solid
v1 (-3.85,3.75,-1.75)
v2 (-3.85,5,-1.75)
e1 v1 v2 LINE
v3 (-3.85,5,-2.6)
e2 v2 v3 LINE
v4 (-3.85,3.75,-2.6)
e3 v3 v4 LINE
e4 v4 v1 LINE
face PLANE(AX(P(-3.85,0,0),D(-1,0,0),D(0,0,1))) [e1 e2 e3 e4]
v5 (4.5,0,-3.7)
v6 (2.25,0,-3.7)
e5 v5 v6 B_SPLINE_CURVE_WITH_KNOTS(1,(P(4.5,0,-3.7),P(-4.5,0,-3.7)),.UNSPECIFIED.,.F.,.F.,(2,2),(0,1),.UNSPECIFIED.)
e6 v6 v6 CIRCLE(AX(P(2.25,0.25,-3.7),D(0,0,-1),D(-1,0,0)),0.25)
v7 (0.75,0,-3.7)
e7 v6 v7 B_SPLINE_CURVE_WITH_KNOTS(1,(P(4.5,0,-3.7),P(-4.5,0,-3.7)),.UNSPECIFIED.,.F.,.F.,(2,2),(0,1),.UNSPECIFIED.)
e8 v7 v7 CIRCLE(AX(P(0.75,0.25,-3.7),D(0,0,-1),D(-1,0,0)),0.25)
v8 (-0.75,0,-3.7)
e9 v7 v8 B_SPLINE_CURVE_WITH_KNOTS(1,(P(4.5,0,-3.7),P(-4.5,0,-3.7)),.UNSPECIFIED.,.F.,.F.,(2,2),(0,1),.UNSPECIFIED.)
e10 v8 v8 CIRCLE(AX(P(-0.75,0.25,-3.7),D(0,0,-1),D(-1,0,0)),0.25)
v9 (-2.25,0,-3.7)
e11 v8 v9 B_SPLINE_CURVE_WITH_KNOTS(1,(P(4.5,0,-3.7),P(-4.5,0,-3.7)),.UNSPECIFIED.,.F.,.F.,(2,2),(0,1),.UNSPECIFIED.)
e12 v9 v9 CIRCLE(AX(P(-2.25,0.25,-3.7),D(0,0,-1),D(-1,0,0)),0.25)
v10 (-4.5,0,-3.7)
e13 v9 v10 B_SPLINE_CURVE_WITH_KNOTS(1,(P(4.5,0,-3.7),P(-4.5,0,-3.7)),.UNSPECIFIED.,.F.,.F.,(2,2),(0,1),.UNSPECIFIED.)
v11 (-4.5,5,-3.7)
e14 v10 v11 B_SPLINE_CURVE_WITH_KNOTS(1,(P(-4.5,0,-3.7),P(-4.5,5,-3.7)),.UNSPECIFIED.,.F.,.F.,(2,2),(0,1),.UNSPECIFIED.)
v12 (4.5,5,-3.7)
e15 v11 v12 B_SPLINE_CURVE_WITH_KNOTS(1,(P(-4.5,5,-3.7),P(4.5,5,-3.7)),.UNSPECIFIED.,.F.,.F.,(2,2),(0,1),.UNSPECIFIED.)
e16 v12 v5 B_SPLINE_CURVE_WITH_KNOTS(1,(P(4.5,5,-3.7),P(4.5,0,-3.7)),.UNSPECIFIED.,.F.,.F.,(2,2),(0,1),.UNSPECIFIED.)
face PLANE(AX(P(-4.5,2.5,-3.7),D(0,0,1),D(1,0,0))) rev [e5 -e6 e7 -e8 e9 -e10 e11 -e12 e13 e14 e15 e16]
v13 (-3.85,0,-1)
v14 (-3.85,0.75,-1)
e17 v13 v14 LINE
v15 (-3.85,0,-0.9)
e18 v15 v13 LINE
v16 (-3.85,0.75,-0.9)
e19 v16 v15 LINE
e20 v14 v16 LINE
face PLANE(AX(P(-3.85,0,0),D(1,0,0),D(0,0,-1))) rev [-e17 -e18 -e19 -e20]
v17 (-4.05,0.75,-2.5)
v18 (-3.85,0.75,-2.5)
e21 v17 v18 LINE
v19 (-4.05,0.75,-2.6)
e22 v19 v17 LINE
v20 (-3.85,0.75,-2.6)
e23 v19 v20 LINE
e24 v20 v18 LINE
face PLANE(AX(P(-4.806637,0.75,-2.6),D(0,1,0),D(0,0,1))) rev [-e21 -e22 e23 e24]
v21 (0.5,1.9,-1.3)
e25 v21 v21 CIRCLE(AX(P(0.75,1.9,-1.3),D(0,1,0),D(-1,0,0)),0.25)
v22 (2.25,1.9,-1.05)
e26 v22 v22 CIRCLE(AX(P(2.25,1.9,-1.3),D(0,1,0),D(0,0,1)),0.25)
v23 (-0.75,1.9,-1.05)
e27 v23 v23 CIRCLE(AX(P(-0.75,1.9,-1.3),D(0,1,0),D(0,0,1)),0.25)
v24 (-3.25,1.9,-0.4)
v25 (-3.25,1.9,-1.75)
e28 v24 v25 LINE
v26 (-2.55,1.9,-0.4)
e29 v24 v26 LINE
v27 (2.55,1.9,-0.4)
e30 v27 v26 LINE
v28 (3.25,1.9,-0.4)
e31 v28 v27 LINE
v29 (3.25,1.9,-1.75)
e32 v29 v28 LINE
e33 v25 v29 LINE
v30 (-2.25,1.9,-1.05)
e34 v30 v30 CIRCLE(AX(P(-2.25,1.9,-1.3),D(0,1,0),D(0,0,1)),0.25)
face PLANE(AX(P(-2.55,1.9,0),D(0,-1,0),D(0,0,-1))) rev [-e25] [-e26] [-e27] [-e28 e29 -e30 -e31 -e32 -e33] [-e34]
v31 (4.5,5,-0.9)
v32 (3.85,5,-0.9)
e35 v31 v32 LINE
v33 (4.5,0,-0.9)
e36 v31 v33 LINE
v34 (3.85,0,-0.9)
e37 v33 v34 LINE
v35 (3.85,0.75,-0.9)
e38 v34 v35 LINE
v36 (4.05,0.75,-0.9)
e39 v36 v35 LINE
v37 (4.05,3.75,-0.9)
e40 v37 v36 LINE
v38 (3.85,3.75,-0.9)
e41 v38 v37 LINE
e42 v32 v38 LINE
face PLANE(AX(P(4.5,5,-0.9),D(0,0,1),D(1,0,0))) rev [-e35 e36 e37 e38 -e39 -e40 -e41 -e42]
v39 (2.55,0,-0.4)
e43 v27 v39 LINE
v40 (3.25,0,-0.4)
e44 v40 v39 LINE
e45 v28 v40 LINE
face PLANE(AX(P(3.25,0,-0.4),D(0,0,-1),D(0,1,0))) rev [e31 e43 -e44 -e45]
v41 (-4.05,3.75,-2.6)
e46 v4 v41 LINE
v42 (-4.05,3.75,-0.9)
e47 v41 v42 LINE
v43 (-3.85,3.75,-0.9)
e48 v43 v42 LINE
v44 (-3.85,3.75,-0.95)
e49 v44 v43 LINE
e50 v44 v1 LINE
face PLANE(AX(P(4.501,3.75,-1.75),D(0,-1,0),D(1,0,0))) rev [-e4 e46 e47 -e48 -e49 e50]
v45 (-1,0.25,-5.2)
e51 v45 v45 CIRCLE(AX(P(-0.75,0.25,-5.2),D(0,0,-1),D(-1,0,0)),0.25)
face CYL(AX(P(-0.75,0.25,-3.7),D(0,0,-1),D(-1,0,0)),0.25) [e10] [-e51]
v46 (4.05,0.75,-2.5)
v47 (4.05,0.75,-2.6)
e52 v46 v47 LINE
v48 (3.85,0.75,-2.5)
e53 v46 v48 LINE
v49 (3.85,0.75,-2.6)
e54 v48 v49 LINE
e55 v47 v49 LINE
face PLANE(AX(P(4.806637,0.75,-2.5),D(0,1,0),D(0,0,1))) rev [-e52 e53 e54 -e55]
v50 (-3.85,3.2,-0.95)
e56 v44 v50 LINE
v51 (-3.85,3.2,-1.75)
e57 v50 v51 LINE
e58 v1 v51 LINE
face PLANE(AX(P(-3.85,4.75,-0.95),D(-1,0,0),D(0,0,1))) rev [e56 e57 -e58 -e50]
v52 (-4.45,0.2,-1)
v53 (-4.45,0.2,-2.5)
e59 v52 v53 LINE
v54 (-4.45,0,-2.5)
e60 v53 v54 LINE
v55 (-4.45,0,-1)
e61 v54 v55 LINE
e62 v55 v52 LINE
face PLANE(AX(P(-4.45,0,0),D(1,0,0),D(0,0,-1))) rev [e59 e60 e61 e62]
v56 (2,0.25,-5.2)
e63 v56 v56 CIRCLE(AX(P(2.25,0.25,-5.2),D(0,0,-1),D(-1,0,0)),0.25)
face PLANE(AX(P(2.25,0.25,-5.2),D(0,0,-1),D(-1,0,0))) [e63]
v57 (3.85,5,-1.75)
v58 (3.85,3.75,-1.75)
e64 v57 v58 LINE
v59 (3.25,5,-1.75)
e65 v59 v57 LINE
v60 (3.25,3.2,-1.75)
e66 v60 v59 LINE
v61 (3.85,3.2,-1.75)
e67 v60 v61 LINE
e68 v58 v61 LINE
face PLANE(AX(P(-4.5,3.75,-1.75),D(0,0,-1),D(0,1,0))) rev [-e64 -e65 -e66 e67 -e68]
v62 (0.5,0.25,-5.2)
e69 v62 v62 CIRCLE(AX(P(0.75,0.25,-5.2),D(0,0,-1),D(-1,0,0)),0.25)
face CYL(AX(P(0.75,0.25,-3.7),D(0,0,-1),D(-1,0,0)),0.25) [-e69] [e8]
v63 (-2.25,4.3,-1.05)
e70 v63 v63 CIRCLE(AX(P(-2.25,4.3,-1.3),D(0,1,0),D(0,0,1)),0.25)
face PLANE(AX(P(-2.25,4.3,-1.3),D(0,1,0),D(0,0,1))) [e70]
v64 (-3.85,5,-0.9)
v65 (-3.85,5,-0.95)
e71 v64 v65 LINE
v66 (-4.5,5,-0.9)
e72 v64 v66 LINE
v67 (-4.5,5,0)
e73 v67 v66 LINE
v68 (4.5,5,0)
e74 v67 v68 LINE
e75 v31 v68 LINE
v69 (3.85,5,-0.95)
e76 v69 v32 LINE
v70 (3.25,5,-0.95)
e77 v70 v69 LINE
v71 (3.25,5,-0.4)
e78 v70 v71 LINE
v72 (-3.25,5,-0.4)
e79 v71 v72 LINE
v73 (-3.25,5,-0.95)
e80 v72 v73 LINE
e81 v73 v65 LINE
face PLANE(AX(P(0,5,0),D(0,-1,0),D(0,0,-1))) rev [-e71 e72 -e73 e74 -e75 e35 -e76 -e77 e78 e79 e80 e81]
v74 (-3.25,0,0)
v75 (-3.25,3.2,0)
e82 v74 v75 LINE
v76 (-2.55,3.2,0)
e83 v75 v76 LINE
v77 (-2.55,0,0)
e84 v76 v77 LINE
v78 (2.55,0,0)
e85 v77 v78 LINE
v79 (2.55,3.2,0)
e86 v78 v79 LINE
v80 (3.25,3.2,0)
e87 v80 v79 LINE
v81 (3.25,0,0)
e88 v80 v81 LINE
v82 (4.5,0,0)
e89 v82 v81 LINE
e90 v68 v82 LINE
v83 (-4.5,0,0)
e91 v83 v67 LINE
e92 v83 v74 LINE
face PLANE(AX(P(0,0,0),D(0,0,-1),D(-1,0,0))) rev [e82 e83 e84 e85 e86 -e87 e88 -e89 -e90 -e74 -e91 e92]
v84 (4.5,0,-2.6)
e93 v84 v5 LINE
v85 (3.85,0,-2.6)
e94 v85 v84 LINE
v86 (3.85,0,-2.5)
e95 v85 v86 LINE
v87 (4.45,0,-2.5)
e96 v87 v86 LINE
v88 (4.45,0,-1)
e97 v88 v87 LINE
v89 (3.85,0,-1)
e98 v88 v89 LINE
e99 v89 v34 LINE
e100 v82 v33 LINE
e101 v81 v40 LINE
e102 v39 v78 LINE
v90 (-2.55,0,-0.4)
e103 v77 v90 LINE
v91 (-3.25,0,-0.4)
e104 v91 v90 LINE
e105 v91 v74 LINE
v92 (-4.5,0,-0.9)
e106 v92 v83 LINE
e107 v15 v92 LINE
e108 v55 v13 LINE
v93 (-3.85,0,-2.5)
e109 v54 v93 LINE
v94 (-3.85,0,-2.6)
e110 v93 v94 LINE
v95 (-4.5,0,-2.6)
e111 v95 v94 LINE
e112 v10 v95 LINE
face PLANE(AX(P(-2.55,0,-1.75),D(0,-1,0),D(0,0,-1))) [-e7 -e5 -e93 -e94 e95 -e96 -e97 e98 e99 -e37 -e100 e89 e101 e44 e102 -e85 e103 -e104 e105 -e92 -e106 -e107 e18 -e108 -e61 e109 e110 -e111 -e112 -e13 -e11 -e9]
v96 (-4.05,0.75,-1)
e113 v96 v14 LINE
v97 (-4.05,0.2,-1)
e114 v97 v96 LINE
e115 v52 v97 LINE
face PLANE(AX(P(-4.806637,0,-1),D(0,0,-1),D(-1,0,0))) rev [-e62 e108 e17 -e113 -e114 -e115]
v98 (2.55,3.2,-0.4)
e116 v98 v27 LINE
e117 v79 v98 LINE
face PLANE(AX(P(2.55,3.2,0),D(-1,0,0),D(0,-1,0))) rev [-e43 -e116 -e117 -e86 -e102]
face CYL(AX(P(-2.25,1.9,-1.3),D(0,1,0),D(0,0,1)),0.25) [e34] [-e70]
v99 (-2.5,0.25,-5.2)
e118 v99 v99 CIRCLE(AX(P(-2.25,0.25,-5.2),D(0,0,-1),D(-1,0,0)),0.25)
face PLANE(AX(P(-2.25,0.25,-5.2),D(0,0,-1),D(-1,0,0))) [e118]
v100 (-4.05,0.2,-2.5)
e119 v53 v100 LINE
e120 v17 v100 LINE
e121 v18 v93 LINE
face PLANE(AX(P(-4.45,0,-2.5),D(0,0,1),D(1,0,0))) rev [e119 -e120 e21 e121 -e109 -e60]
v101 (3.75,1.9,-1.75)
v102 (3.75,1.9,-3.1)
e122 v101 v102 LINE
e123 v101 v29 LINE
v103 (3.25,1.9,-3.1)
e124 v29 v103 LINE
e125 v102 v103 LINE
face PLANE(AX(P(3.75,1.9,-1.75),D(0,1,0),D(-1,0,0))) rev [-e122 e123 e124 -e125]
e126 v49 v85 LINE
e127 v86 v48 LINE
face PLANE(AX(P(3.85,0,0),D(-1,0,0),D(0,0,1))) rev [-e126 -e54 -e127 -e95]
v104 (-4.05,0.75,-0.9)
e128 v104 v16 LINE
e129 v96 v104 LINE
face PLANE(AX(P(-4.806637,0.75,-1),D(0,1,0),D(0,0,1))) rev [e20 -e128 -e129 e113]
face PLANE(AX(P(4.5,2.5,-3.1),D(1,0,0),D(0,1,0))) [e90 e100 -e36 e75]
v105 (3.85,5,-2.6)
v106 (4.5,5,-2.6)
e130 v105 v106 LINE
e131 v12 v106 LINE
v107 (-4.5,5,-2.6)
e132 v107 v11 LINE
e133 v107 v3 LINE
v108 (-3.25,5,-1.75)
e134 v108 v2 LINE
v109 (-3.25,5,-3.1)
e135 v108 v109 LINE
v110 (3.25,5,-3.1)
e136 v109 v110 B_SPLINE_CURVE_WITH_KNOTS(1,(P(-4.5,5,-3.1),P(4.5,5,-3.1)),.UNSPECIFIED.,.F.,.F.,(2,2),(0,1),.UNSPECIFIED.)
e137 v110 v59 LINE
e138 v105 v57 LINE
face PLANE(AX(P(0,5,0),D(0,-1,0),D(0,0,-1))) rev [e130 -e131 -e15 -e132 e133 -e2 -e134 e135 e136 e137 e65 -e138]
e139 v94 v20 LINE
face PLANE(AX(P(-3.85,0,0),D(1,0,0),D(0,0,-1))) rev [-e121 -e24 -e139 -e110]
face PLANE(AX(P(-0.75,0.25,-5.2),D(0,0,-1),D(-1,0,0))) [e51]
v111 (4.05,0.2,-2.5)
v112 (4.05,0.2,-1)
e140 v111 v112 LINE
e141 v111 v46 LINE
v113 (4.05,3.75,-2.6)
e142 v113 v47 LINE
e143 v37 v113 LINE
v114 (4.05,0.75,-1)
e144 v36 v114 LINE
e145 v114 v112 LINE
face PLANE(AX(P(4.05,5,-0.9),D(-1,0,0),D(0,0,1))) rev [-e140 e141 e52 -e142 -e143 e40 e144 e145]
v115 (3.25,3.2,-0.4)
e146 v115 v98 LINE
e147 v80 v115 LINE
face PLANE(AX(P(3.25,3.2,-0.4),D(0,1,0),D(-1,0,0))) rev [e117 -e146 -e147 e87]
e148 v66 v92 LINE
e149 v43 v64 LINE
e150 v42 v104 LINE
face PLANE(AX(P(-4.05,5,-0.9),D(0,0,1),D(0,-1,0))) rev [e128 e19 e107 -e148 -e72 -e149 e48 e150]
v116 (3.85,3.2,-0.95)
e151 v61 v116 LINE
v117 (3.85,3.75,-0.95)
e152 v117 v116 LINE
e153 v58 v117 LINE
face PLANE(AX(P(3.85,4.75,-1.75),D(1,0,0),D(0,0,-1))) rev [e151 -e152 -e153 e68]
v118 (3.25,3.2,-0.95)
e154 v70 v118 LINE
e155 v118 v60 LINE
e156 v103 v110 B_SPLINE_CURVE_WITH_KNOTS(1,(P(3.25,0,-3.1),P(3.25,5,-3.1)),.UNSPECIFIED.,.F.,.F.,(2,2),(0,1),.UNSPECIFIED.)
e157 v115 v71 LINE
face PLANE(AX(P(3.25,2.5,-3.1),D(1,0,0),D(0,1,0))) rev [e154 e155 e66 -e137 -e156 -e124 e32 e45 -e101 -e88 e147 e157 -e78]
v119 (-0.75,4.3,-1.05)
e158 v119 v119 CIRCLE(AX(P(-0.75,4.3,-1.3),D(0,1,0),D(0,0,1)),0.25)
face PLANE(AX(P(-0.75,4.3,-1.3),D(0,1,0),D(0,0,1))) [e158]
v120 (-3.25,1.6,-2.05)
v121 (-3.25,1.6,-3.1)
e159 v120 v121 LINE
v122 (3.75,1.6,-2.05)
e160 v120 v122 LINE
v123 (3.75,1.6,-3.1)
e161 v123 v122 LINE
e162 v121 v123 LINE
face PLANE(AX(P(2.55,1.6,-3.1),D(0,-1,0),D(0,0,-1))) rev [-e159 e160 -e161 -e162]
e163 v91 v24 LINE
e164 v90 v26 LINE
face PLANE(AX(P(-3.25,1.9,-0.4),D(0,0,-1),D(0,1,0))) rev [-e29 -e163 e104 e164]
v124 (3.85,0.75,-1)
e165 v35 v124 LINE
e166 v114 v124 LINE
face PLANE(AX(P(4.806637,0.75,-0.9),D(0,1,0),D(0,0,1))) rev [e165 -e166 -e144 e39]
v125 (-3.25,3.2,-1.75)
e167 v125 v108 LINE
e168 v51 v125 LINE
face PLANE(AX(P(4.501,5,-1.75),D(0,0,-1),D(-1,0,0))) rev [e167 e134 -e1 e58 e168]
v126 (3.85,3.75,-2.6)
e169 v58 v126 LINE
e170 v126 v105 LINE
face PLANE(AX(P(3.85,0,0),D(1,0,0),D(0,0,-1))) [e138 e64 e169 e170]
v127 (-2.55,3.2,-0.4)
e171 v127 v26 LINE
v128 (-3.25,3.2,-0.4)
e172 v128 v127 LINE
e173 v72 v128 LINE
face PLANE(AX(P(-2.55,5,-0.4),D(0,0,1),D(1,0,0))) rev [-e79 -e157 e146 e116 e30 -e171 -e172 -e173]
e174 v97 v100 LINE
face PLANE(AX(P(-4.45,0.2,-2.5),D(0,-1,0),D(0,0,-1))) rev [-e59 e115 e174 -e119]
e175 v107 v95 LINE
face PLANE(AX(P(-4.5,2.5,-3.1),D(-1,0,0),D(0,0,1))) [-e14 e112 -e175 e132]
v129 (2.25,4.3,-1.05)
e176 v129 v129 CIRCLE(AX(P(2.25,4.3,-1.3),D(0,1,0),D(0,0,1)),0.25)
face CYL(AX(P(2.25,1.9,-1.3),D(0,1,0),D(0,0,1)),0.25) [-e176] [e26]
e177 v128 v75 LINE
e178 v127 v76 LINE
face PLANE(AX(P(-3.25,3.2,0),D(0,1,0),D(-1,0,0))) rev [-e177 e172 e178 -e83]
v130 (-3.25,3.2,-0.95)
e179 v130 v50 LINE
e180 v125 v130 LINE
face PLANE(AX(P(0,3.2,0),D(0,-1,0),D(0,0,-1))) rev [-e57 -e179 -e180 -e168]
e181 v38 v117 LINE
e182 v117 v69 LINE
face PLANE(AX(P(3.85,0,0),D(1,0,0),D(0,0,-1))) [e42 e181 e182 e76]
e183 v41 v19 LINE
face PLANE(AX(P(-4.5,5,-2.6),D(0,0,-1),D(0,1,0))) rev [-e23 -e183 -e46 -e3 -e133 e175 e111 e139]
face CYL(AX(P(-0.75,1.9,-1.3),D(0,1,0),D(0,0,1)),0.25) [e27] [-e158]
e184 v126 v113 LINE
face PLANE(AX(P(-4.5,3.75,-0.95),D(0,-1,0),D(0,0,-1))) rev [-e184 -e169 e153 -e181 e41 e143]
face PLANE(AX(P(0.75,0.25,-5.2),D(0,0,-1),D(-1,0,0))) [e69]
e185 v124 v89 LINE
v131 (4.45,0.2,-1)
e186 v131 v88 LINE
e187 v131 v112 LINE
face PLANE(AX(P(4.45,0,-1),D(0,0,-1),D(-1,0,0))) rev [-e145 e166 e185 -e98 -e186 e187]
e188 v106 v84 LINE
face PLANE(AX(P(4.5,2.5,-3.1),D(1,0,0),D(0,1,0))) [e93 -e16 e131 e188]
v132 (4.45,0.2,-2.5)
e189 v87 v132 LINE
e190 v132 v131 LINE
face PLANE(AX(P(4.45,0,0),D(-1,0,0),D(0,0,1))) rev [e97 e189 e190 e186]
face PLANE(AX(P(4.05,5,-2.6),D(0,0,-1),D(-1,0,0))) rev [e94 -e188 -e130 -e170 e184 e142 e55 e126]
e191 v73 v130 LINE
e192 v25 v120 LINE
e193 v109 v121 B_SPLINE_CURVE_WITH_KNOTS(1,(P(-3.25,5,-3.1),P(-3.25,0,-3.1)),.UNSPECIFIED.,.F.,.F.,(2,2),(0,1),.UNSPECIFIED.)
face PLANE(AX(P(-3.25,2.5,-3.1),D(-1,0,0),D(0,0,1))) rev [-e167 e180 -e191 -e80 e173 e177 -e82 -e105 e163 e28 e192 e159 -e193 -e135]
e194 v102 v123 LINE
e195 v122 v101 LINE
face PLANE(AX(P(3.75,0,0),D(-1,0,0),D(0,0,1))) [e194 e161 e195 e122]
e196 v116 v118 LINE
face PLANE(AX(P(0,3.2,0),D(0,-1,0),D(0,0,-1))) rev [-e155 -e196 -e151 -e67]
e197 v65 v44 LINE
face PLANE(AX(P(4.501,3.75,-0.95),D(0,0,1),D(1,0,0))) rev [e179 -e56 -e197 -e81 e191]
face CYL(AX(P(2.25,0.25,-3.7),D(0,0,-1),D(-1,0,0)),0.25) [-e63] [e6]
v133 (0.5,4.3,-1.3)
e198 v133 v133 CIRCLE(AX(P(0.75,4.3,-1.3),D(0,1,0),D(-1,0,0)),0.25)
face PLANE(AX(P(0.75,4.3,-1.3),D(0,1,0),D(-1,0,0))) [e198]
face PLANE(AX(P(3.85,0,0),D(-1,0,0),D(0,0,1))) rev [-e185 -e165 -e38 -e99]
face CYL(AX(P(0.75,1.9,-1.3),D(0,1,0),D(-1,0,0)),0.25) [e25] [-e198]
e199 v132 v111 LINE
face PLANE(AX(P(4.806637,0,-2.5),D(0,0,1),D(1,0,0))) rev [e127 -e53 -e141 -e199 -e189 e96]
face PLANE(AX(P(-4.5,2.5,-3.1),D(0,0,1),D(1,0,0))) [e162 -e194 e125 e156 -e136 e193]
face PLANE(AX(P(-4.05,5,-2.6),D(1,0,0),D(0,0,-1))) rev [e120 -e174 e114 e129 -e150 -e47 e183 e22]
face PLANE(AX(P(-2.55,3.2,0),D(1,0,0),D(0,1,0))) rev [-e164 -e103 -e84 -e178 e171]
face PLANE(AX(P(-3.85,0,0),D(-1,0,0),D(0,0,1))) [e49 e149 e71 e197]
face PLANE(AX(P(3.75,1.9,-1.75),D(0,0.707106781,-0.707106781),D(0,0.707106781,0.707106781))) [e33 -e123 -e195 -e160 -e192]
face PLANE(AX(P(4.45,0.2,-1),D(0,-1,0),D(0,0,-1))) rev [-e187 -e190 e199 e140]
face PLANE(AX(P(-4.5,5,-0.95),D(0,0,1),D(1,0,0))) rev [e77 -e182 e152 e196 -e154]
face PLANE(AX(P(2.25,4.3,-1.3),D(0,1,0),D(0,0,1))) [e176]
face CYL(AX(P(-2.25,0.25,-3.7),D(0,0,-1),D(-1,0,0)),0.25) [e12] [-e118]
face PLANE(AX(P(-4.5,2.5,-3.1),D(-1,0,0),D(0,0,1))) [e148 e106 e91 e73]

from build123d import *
from build123d.topology import SkipClean

# Parameters (mm, degrees)
BOSS_EXTRUDE1_START  = -2.55
BOSS_EXTRUDE1_DEPTH  = 5.1
SKETCH2_W            = 5.1
SKETCH2_H            = 1.9
BOSS_EXTRUDE2_DEPTH  = 1.75
SKETCH3_W            = 5.100000167
SKETCH3_H            = 0.4
BOSS_EXTRUDE3_DEPTH  = 3.1
SKETCH4_W            = 5.1
SKETCH4_H            = 1.6
BOSS_EXTRUDE4_DEPTH  = 1.05
BOSS_EXTRUDE5_DEPTH  = 0.700000167
SKETCH6_W            = 0.4
SKETCH6_H            = 1.8
BOSS_EXTRUDE6_DEPTH  = 0.7
SKETCH7_W            = 0.4
SKETCH7_H            = 1.8
BOSS_EXTRUDE7_DEPTH  = 0.7
BOSS_EXTRUDE8_DEPTH  = 0.7
SKETCH9_W            = 3.1
SKETCH9_H            = 5
BOSS_EXTRUDE9_DEPTH  = 1.25
SKETCH10_W           = 3.1
SKETCH10_H           = 5
BOSS_EXTRUDE10_DEPTH = 1.25
SKETCH11_W           = 9
SKETCH11_H           = 5
BOSS_EXTRUDE11_DEPTH = 0.6
CUT_EXTRUDE1_DEPTH   = 0.5
SKETCH13_W           = 0.45
SKETCH13_H           = 1.7
CUT_EXTRUDE2_DEPTH   = 8.677239185
CUT_EXTRUDE3_REACH   = 12.573
SKETCH14_W           = 0.8
SKETCH14_H           = 1.25
SKETCH15_W           = 0.85
SKETCH15_H           = 1.25
CUT_EXTRUDE4_DEPTH   = 0.2
SKETCH16_W           = 0.05
SKETCH16_H           = 1.25
CUT_EXTRUDE5_DEPTH   = 0.2
CUT_EXTRUDE6_REACH   = 8.647
SKETCH18_W           = 0.6
SKETCH18_H           = 0.8
SKETCH19_W           = 0.45
SKETCH19_H           = 1.7
CUT_EXTRUDE7_DEPTH   = 8.677239185
SKETCH20_W           = 0.8
SKETCH20_H           = 1.25
CUT_EXTRUDE8_DEPTH   = 11.573197246
SKETCH21_W           = 0.85
SKETCH21_H           = 1.25
CUT_EXTRUDE9_DEPTH   = 0.2
CUT_EXTRUDE10_REACH  = 12.412
SKETCH23_W           = 0.1
SKETCH23_H           = 0.75
SKETCH24_W           = 1.5
SKETCH24_H           = 0.2
BOSS_EXTRUDE12_DEPTH = 0.4
CUT_EXTRUDE11_REACH  = 12.412
SKETCH26_W           = 0.1
SKETCH26_H           = 0.75
CUT_EXTRUDE12_REACH  = 12.412
SKETCH28_W           = 0.75
SKETCH28_H           = 0.1
SKETCH29_W           = 1.5
SKETCH29_H           = 0.2
BOSS_EXTRUDE13_DEPTH = 0.4
CUT_EXTRUDE13_REACH  = 12.412
SKETCH31_W           = 0.75
SKETCH31_H           = 0.1
SKETCH32_W           = 0.05
SKETCH32_H           = 1.25
CUT_EXTRUDE14_DEPTH  = 0.2
CUT_EXTRUDE15_REACH  = 8.647
SKETCH34_W           = 0.6
SKETCH34_H           = 0.8
SKETCH35_W           = 0.25
SKETCH35_H           = 2.4
SKETCH36_W           = 0.25
SKETCH36_H           = 2.4
SKETCH37_W           = 0.25
SKETCH37_H           = 2.4
SKETCH38_W           = 0.25
SKETCH38_H           = 2.4
SKETCH39_W           = 0.25
SKETCH39_H           = 1.5
SKETCH40_W           = 0.25
SKETCH40_H           = 1.5
SKETCH41_W           = 0.25
SKETCH41_H           = 1.5
SKETCH42_W           = 0.25
SKETCH42_H           = 1.5


with BuildPart() as part:
    # Boss-Extrude1: read off the stored shape, not the designer's step
    # Boss-Extrude1 outline → Boss-Extrude1 (new body)
    with BuildSketch(Plane.YZ.offset(BOSS_EXTRUDE1_START)):
        Polygon((0, -2.05), (1.6, -2.05), (1.9, -1.75), (0, -1.75), align=None)
    extrude(amount=BOSS_EXTRUDE1_DEPTH)

    # Sketch2 → Boss-Extrude2 (add)
    with BuildSketch(Plane.XY.offset(-1.75)):
        with Locations((0, 0.95)):
            Rectangle(SKETCH2_W, SKETCH2_H)
    extrude(amount=BOSS_EXTRUDE2_DEPTH)

    # Sketch3 → Boss-Extrude3 (add)
    with BuildSketch(Plane(origin=(0, 1.9, 0), x_dir=(-1, 0, 0), z_dir=(0, 1, 0))):
        with Locations((-8.4e-08, -0.2)):
            Rectangle(SKETCH3_W, SKETCH3_H)
    extrude(amount=BOSS_EXTRUDE3_DEPTH)

    # Sketch4 → Boss-Extrude4 (add)
    with BuildSketch(Plane(origin=(0, 0, -2.05), x_dir=(-1, 0, 0), z_dir=(0, 0, -1))):
        with Locations((0, 0.8)):
            Rectangle(SKETCH4_W, SKETCH4_H)
    extrude(amount=BOSS_EXTRUDE4_DEPTH)

    # Sketch5 → Boss-Extrude5 (add)
    with BuildSketch(Plane(origin=(2.55, 0, 0), x_dir=(0, 0, -1), z_dir=(1, 0, 0))):
        Polygon((3.1, 0), (0.4, 0), (0.4, 1.9), (1.75, 1.9), (2.05, 1.6), (3.1, 1.6), align=None)
    extrude(amount=BOSS_EXTRUDE5_DEPTH)

    # Sketch6 → Boss-Extrude6 (add)
    with BuildSketch(Plane(origin=(2.55, 0, 0), x_dir=(0, 0, -1), z_dir=(1, 0, 0))):
        with Locations((0.2, 4.1)):
            Rectangle(SKETCH6_W, SKETCH6_H)
    extrude(amount=BOSS_EXTRUDE6_DEPTH)

    # Sketch7 → Boss-Extrude7 (add)
    with BuildSketch(Plane.ZY.offset(2.55)):
        with Locations((-0.2, 4.1)):
            Rectangle(SKETCH7_W, SKETCH7_H)
    extrude(amount=BOSS_EXTRUDE7_DEPTH)

    # Sketch8 → Boss-Extrude8 (add)
    with BuildSketch(Plane.ZY.offset(2.55)):
        Polygon((-0.4, 1.9), (-0.4, 0), (-3.1, 0), (-3.1, 1.6), (-2.05, 1.6), (-1.75, 1.9), align=None)
    extrude(amount=BOSS_EXTRUDE8_DEPTH)

    # Sketch9 → Boss-Extrude9 (add)
    with BuildSketch(Plane.ZY.offset(3.25)):
        with Locations((-1.55, 2.5)):
            Rectangle(SKETCH9_W, SKETCH9_H)
    extrude(amount=BOSS_EXTRUDE9_DEPTH)

    # Sketch10 → Boss-Extrude10 (add)
    with BuildSketch(Plane(origin=(3.250000167, 0, 0), x_dir=(0, 0, -1), z_dir=(1, 0, 0))):
        with Locations((1.55, 2.5)):
            Rectangle(SKETCH10_W, SKETCH10_H)
    extrude(amount=BOSS_EXTRUDE10_DEPTH)

    # Sketch11 → Boss-Extrude11 (add)
    with SkipClean():  # the faces are left unmerged after this step: merging them gives an invalid solid
        with BuildSketch(Plane(origin=(0, 0, -3.1), x_dir=(-1, 0, 0), z_dir=(0, 0, -1))):
            with Locations((0, 2.5)):
                Rectangle(SKETCH11_W, SKETCH11_H)
        extrude(amount=BOSS_EXTRUDE11_DEPTH)

    # Sketch12 → Cut-Extrude1 (cut)
    with SkipClean():  # the faces are left unmerged after this step: merging them gives an invalid solid
        with BuildSketch(Plane.ZY.offset(-3.250000167)):
            Polygon((-3.1, 1.6), (-2.05, 1.6), (-1.75, 1.9), (-3.1, 1.9), align=None)
        extrude(amount=-CUT_EXTRUDE1_DEPTH, mode=Mode.SUBTRACT)

    # Sketch13 → Cut-Extrude2 (cut, through all)
    with SkipClean():  # the faces are left unmerged after this step: merging them gives an invalid solid
        with BuildSketch(Plane.XZ):
            with Locations((-4.275, -1.75)):
                Rectangle(SKETCH13_W, SKETCH13_H)
        extrude(amount=-CUT_EXTRUDE2_DEPTH, mode=Mode.SUBTRACT)

    # Sketch14 → Cut-Extrude3 (cut, up to next)
    with BuildSketch(Plane.ZY.offset(4.05), mode=Mode.PRIVATE) as cut_extrude3_sk1:
        with Locations((-1.35, 4.375)):
            Rectangle(SKETCH14_W, SKETCH14_H)
    cut_extrude3_tool1 = extrude(cut_extrude3_sk1.sketch, amount=-CUT_EXTRUDE3_REACH, mode=Mode.PRIVATE) & part.part
    add(cut_extrude3_tool1.solids().sort_by_distance((-4.05, 4.375, -1.35))[0], mode=Mode.SUBTRACT)

    # Sketch15 → Cut-Extrude4 (cut)
    with SkipClean():  # the faces are left unmerged after this step: merging them gives an invalid solid
        with BuildSketch(Plane.ZY.offset(4.05)):
            with Locations((-2.175, 4.375)):
                Rectangle(SKETCH15_W, SKETCH15_H)
        extrude(amount=-CUT_EXTRUDE4_DEPTH, mode=Mode.SUBTRACT)

    # Sketch16 → Cut-Extrude5 (cut)
    with SkipClean():  # the faces are left unmerged after this step: merging them gives an invalid solid
        with BuildSketch(Plane.ZY.offset(4.05)):
            with Locations((-0.925, 4.375)):
                Rectangle(SKETCH16_W, SKETCH16_H)
        extrude(amount=-CUT_EXTRUDE5_DEPTH, mode=Mode.SUBTRACT)

    # Sketch18 → Cut-Extrude6 (cut, up to next)
    with BuildSketch(Plane.XZ.offset(-3.2), mode=Mode.PRIVATE) as cut_extrude6_sk1:
        with Locations((-3.55, -1.35)):
            Rectangle(SKETCH18_W, SKETCH18_H)
    cut_extrude6_tool1 = extrude(cut_extrude6_sk1.sketch, amount=-CUT_EXTRUDE6_REACH, mode=Mode.PRIVATE) & part.part
    add(cut_extrude6_tool1.solids().sort_by_distance((-3.55, 3.2, -1.35))[0], mode=Mode.SUBTRACT)

    # Sketch19 → Cut-Extrude7 (cut, through all)
    with SkipClean():  # the faces are left unmerged after this step: merging them gives an invalid solid
        with BuildSketch(Plane.XZ):
            with Locations((4.275, -1.75)):
                Rectangle(SKETCH19_W, SKETCH19_H)
        extrude(amount=-CUT_EXTRUDE7_DEPTH, mode=Mode.SUBTRACT)

    # Sketch20 → Cut-Extrude8 (cut, through all)
    with SkipClean():  # the faces are left unmerged after this step: merging them gives an invalid solid
        with BuildSketch(Plane(origin=(4.05, 0, 0), x_dir=(0, 0, -1), z_dir=(1, 0, 0))):
            with Locations((1.35, 4.375)):
                Rectangle(SKETCH20_W, SKETCH20_H)
        extrude(amount=-CUT_EXTRUDE8_DEPTH, mode=Mode.SUBTRACT)

    # Sketch21 → Cut-Extrude9 (cut)
    with SkipClean():  # the faces are left unmerged after this step: merging them gives an invalid solid
        with BuildSketch(Plane(origin=(4.05, 0, 0), x_dir=(0, 0, -1), z_dir=(1, 0, 0))):
            with Locations((2.175, 4.375)):
                Rectangle(SKETCH21_W, SKETCH21_H)
        extrude(amount=-CUT_EXTRUDE9_DEPTH, mode=Mode.SUBTRACT)

    # Sketch23 → Cut-Extrude10 (cut, up to next)
    with BuildSketch(Plane(origin=(-3.85, 0, 0), x_dir=(0, 0, -1), z_dir=(1, 0, 0)), mode=Mode.PRIVATE) as cut_extrude10_sk1:
        with Locations((0.95, 0.375)):
            Rectangle(SKETCH23_W, SKETCH23_H)
    cut_extrude10_tool1 = extrude(cut_extrude10_sk1.sketch, amount=-CUT_EXTRUDE10_REACH, mode=Mode.PRIVATE) & part.part
    add(cut_extrude10_tool1.solids().sort_by_distance((-3.85, 0.375, -0.95))[0], mode=Mode.SUBTRACT)

    # Sketch24 → Boss-Extrude12 (add)
    with SkipClean():  # the faces are left unmerged after this step: merging them gives an invalid solid
        with BuildSketch(Plane.ZY.offset(4.05)):
            with Locations((-1.75, 0.1)):
                Rectangle(SKETCH24_W, SKETCH24_H)
        extrude(amount=BOSS_EXTRUDE12_DEPTH)

    # Sketch26 → Cut-Extrude11 (cut, up to next)
    with BuildSketch(Plane(origin=(-3.85, 0, 0), x_dir=(0, 0, -1), z_dir=(1, 0, 0)), mode=Mode.PRIVATE) as cut_extrude11_sk1:
        with Locations((2.55, 0.375)):
            Rectangle(SKETCH26_W, SKETCH26_H)
    cut_extrude11_tool1 = extrude(cut_extrude11_sk1.sketch, amount=-CUT_EXTRUDE11_REACH, mode=Mode.PRIVATE) & part.part
    add(cut_extrude11_tool1.solids().sort_by_distance((-3.85, 0.375, -2.55))[0], mode=Mode.SUBTRACT)

    # Sketch28 → Cut-Extrude12 (cut, up to next)
    with BuildSketch(Plane(origin=(3.85, 0, 0), x_dir=(0, -1, 0), z_dir=(-1, 0, 0)), mode=Mode.PRIVATE) as cut_extrude12_sk1:
        with Locations((-0.375, -2.55)):
            Rectangle(SKETCH28_W, SKETCH28_H)
    cut_extrude12_tool1 = extrude(cut_extrude12_sk1.sketch, amount=-CUT_EXTRUDE12_REACH, mode=Mode.PRIVATE) & part.part
    add(cut_extrude12_tool1.solids().sort_by_distance((3.85, 0.375, -2.55))[0], mode=Mode.SUBTRACT)

    # Sketch29 → Boss-Extrude13 (add)
    with SkipClean():  # the faces are left unmerged after this step: merging them gives an invalid solid
        with BuildSketch(Plane(origin=(4.05, 0, 0), x_dir=(0, 0, -1), z_dir=(1, 0, 0))):
            with Locations((1.75, 0.1)):
                Rectangle(SKETCH29_W, SKETCH29_H)
        extrude(amount=BOSS_EXTRUDE13_DEPTH)

    # Sketch31 → Cut-Extrude13 (cut, up to next)
    with BuildSketch(Plane(origin=(3.85, 0, 0), x_dir=(0, -1, 0), z_dir=(-1, 0, 0)), mode=Mode.PRIVATE) as cut_extrude13_sk1:
        with Locations((-0.375, -0.95)):
            Rectangle(SKETCH31_W, SKETCH31_H)
    cut_extrude13_tool1 = extrude(cut_extrude13_sk1.sketch, amount=-CUT_EXTRUDE13_REACH, mode=Mode.PRIVATE) & part.part
    add(cut_extrude13_tool1.solids().sort_by_distance((3.85, 0.375, -0.95))[0], mode=Mode.SUBTRACT)

    # Sketch32 → Cut-Extrude14 (cut)
    with SkipClean():  # the faces are left unmerged after this step: merging them gives an invalid solid
        with BuildSketch(Plane(origin=(4.05, 0, 0), x_dir=(0, 0, -1), z_dir=(1, 0, 0))):
            with Locations((0.925, 4.375)):
                Rectangle(SKETCH32_W, SKETCH32_H)
        extrude(amount=-CUT_EXTRUDE14_DEPTH, mode=Mode.SUBTRACT)

    # Sketch34 → Cut-Extrude15 (cut, up to next)
    with BuildSketch(Plane.XZ.offset(-3.2), mode=Mode.PRIVATE) as cut_extrude15_sk1:
        with Locations((3.55, -1.35)):
            Rectangle(SKETCH34_W, SKETCH34_H)
    cut_extrude15_tool1 = extrude(cut_extrude15_sk1.sketch, amount=-CUT_EXTRUDE15_REACH, mode=Mode.PRIVATE) & part.part
    add(cut_extrude15_tool1.solids().sort_by_distance((3.55, 3.2, -1.35))[0], mode=Mode.SUBTRACT)

    # Sketch35 → Revolve1 (revolve)
    with SkipClean():  # the faces are left unmerged after this step: merging them gives an invalid solid
        with BuildSketch(Plane(origin=(0, 0, -1.3), x_dir=(-1, 0, 0), z_dir=(0, 0, -1)), mode=Mode.PRIVATE) as revolve1_sk:
            with Locations((-2.375, 3.1)):
                Rectangle(SKETCH35_W, SKETCH35_H)
        revolve(revolve1_sk.sketch.rotate(Axis((2.25, 1.9, -1.3), (0, 1, 0)), 270), axis=Axis((2.25, 1.9, -1.3), (0, 1, 0)))

    # Sketch36 → Revolve2 (revolve)
    with SkipClean():  # the faces are left unmerged after this step: merging them gives an invalid solid
        with BuildSketch(Plane(origin=(0, 0, -1.3), x_dir=(-1, 0, 0), z_dir=(0, 0, -1)), mode=Mode.PRIVATE) as revolve2_sk:
            with Locations((-0.875, 3.1)):
                Rectangle(SKETCH36_W, SKETCH36_H)
        revolve(revolve2_sk.sketch.rotate(Axis((0.75, 1.9, -1.3), (0, 1, 0)), 180), axis=Axis((0.75, 1.9, -1.3), (0, 1, 0)))

    # Sketch37 → Revolve3 (revolve)
    with SkipClean():  # the faces are left unmerged after this step: merging them gives an invalid solid
        with BuildSketch(Plane(origin=(0, 0, -1.3), x_dir=(-1, 0, 0), z_dir=(0, 0, -1)), mode=Mode.PRIVATE) as revolve3_sk:
            with Locations((0.625, 3.1)):
                Rectangle(SKETCH37_W, SKETCH37_H)
        revolve(revolve3_sk.sketch.rotate(Axis((-0.75, 1.9, -1.3), (0, 1, 0)), 270), axis=Axis((-0.75, 1.9, -1.3), (0, 1, 0)))

    # Sketch38 → Revolve4 (revolve)
    with SkipClean():  # the faces are left unmerged after this step: merging them gives an invalid solid
        with BuildSketch(Plane(origin=(0, 0, -1.3), x_dir=(-1, 0, 0), z_dir=(0, 0, -1)), mode=Mode.PRIVATE) as revolve4_sk:
            with Locations((2.125, 3.1)):
                Rectangle(SKETCH38_W, SKETCH38_H)
        revolve(revolve4_sk.sketch.rotate(Axis((-2.25, 1.9, -1.3), (0, 1, 0)), 270), axis=Axis((-2.25, 1.9, -1.3), (0, 1, 0)))

    # Sketch39 → Revolve5 (revolve)
    with SkipClean():  # the faces are left unmerged after this step: merging them gives an invalid solid
        with BuildSketch(Plane.XZ.offset(-0.25), mode=Mode.PRIVATE) as revolve5_sk:
            with Locations((2.375, -4.45)):
                Rectangle(SKETCH39_W, SKETCH39_H)
        revolve(revolve5_sk.sketch.rotate(Axis((2.25, 0.25, -3.7), (0, 0, -1)), 180), axis=Axis((2.25, 0.25, -3.7), (0, 0, -1)))

    # Sketch40 → Revolve6 (revolve)
    with SkipClean():  # the faces are left unmerged after this step: merging them gives an invalid solid
        with BuildSketch(Plane.XZ.offset(-0.25), mode=Mode.PRIVATE) as revolve6_sk:
            with Locations((0.875, -4.45)):
                Rectangle(SKETCH40_W, SKETCH40_H)
        revolve(revolve6_sk.sketch.rotate(Axis((0.75, 0.25, -3.7), (0, 0, -1)), 180), axis=Axis((0.75, 0.25, -3.7), (0, 0, -1)))

    # Sketch41 → Revolve7 (revolve)
    with SkipClean():  # the faces are left unmerged after this step: merging them gives an invalid solid
        with BuildSketch(Plane.XZ.offset(-0.25), mode=Mode.PRIVATE) as revolve7_sk:
            with Locations((-0.625, -4.45)):
                Rectangle(SKETCH41_W, SKETCH41_H)
        revolve(revolve7_sk.sketch.rotate(Axis((-0.75, 0.25, -3.7), (0, 0, -1)), 180), axis=Axis((-0.75, 0.25, -3.7), (0, 0, -1)))

    # Sketch42 → Revolve8 (revolve)
    with SkipClean():  # the faces are left unmerged after this step: merging them gives an invalid solid
        with BuildSketch(Plane.XZ.offset(-0.25), mode=Mode.PRIVATE) as revolve8_sk:
            with Locations((-2.125, -4.45)):
                Rectangle(SKETCH42_W, SKETCH42_H)
        revolve(revolve8_sk.sketch.rotate(Axis((-2.25, 0.25, -3.7), (0, 0, -1)), 180), axis=Axis((-2.25, 0.25, -3.7), (0, 0, -1)))


solid = part.part
